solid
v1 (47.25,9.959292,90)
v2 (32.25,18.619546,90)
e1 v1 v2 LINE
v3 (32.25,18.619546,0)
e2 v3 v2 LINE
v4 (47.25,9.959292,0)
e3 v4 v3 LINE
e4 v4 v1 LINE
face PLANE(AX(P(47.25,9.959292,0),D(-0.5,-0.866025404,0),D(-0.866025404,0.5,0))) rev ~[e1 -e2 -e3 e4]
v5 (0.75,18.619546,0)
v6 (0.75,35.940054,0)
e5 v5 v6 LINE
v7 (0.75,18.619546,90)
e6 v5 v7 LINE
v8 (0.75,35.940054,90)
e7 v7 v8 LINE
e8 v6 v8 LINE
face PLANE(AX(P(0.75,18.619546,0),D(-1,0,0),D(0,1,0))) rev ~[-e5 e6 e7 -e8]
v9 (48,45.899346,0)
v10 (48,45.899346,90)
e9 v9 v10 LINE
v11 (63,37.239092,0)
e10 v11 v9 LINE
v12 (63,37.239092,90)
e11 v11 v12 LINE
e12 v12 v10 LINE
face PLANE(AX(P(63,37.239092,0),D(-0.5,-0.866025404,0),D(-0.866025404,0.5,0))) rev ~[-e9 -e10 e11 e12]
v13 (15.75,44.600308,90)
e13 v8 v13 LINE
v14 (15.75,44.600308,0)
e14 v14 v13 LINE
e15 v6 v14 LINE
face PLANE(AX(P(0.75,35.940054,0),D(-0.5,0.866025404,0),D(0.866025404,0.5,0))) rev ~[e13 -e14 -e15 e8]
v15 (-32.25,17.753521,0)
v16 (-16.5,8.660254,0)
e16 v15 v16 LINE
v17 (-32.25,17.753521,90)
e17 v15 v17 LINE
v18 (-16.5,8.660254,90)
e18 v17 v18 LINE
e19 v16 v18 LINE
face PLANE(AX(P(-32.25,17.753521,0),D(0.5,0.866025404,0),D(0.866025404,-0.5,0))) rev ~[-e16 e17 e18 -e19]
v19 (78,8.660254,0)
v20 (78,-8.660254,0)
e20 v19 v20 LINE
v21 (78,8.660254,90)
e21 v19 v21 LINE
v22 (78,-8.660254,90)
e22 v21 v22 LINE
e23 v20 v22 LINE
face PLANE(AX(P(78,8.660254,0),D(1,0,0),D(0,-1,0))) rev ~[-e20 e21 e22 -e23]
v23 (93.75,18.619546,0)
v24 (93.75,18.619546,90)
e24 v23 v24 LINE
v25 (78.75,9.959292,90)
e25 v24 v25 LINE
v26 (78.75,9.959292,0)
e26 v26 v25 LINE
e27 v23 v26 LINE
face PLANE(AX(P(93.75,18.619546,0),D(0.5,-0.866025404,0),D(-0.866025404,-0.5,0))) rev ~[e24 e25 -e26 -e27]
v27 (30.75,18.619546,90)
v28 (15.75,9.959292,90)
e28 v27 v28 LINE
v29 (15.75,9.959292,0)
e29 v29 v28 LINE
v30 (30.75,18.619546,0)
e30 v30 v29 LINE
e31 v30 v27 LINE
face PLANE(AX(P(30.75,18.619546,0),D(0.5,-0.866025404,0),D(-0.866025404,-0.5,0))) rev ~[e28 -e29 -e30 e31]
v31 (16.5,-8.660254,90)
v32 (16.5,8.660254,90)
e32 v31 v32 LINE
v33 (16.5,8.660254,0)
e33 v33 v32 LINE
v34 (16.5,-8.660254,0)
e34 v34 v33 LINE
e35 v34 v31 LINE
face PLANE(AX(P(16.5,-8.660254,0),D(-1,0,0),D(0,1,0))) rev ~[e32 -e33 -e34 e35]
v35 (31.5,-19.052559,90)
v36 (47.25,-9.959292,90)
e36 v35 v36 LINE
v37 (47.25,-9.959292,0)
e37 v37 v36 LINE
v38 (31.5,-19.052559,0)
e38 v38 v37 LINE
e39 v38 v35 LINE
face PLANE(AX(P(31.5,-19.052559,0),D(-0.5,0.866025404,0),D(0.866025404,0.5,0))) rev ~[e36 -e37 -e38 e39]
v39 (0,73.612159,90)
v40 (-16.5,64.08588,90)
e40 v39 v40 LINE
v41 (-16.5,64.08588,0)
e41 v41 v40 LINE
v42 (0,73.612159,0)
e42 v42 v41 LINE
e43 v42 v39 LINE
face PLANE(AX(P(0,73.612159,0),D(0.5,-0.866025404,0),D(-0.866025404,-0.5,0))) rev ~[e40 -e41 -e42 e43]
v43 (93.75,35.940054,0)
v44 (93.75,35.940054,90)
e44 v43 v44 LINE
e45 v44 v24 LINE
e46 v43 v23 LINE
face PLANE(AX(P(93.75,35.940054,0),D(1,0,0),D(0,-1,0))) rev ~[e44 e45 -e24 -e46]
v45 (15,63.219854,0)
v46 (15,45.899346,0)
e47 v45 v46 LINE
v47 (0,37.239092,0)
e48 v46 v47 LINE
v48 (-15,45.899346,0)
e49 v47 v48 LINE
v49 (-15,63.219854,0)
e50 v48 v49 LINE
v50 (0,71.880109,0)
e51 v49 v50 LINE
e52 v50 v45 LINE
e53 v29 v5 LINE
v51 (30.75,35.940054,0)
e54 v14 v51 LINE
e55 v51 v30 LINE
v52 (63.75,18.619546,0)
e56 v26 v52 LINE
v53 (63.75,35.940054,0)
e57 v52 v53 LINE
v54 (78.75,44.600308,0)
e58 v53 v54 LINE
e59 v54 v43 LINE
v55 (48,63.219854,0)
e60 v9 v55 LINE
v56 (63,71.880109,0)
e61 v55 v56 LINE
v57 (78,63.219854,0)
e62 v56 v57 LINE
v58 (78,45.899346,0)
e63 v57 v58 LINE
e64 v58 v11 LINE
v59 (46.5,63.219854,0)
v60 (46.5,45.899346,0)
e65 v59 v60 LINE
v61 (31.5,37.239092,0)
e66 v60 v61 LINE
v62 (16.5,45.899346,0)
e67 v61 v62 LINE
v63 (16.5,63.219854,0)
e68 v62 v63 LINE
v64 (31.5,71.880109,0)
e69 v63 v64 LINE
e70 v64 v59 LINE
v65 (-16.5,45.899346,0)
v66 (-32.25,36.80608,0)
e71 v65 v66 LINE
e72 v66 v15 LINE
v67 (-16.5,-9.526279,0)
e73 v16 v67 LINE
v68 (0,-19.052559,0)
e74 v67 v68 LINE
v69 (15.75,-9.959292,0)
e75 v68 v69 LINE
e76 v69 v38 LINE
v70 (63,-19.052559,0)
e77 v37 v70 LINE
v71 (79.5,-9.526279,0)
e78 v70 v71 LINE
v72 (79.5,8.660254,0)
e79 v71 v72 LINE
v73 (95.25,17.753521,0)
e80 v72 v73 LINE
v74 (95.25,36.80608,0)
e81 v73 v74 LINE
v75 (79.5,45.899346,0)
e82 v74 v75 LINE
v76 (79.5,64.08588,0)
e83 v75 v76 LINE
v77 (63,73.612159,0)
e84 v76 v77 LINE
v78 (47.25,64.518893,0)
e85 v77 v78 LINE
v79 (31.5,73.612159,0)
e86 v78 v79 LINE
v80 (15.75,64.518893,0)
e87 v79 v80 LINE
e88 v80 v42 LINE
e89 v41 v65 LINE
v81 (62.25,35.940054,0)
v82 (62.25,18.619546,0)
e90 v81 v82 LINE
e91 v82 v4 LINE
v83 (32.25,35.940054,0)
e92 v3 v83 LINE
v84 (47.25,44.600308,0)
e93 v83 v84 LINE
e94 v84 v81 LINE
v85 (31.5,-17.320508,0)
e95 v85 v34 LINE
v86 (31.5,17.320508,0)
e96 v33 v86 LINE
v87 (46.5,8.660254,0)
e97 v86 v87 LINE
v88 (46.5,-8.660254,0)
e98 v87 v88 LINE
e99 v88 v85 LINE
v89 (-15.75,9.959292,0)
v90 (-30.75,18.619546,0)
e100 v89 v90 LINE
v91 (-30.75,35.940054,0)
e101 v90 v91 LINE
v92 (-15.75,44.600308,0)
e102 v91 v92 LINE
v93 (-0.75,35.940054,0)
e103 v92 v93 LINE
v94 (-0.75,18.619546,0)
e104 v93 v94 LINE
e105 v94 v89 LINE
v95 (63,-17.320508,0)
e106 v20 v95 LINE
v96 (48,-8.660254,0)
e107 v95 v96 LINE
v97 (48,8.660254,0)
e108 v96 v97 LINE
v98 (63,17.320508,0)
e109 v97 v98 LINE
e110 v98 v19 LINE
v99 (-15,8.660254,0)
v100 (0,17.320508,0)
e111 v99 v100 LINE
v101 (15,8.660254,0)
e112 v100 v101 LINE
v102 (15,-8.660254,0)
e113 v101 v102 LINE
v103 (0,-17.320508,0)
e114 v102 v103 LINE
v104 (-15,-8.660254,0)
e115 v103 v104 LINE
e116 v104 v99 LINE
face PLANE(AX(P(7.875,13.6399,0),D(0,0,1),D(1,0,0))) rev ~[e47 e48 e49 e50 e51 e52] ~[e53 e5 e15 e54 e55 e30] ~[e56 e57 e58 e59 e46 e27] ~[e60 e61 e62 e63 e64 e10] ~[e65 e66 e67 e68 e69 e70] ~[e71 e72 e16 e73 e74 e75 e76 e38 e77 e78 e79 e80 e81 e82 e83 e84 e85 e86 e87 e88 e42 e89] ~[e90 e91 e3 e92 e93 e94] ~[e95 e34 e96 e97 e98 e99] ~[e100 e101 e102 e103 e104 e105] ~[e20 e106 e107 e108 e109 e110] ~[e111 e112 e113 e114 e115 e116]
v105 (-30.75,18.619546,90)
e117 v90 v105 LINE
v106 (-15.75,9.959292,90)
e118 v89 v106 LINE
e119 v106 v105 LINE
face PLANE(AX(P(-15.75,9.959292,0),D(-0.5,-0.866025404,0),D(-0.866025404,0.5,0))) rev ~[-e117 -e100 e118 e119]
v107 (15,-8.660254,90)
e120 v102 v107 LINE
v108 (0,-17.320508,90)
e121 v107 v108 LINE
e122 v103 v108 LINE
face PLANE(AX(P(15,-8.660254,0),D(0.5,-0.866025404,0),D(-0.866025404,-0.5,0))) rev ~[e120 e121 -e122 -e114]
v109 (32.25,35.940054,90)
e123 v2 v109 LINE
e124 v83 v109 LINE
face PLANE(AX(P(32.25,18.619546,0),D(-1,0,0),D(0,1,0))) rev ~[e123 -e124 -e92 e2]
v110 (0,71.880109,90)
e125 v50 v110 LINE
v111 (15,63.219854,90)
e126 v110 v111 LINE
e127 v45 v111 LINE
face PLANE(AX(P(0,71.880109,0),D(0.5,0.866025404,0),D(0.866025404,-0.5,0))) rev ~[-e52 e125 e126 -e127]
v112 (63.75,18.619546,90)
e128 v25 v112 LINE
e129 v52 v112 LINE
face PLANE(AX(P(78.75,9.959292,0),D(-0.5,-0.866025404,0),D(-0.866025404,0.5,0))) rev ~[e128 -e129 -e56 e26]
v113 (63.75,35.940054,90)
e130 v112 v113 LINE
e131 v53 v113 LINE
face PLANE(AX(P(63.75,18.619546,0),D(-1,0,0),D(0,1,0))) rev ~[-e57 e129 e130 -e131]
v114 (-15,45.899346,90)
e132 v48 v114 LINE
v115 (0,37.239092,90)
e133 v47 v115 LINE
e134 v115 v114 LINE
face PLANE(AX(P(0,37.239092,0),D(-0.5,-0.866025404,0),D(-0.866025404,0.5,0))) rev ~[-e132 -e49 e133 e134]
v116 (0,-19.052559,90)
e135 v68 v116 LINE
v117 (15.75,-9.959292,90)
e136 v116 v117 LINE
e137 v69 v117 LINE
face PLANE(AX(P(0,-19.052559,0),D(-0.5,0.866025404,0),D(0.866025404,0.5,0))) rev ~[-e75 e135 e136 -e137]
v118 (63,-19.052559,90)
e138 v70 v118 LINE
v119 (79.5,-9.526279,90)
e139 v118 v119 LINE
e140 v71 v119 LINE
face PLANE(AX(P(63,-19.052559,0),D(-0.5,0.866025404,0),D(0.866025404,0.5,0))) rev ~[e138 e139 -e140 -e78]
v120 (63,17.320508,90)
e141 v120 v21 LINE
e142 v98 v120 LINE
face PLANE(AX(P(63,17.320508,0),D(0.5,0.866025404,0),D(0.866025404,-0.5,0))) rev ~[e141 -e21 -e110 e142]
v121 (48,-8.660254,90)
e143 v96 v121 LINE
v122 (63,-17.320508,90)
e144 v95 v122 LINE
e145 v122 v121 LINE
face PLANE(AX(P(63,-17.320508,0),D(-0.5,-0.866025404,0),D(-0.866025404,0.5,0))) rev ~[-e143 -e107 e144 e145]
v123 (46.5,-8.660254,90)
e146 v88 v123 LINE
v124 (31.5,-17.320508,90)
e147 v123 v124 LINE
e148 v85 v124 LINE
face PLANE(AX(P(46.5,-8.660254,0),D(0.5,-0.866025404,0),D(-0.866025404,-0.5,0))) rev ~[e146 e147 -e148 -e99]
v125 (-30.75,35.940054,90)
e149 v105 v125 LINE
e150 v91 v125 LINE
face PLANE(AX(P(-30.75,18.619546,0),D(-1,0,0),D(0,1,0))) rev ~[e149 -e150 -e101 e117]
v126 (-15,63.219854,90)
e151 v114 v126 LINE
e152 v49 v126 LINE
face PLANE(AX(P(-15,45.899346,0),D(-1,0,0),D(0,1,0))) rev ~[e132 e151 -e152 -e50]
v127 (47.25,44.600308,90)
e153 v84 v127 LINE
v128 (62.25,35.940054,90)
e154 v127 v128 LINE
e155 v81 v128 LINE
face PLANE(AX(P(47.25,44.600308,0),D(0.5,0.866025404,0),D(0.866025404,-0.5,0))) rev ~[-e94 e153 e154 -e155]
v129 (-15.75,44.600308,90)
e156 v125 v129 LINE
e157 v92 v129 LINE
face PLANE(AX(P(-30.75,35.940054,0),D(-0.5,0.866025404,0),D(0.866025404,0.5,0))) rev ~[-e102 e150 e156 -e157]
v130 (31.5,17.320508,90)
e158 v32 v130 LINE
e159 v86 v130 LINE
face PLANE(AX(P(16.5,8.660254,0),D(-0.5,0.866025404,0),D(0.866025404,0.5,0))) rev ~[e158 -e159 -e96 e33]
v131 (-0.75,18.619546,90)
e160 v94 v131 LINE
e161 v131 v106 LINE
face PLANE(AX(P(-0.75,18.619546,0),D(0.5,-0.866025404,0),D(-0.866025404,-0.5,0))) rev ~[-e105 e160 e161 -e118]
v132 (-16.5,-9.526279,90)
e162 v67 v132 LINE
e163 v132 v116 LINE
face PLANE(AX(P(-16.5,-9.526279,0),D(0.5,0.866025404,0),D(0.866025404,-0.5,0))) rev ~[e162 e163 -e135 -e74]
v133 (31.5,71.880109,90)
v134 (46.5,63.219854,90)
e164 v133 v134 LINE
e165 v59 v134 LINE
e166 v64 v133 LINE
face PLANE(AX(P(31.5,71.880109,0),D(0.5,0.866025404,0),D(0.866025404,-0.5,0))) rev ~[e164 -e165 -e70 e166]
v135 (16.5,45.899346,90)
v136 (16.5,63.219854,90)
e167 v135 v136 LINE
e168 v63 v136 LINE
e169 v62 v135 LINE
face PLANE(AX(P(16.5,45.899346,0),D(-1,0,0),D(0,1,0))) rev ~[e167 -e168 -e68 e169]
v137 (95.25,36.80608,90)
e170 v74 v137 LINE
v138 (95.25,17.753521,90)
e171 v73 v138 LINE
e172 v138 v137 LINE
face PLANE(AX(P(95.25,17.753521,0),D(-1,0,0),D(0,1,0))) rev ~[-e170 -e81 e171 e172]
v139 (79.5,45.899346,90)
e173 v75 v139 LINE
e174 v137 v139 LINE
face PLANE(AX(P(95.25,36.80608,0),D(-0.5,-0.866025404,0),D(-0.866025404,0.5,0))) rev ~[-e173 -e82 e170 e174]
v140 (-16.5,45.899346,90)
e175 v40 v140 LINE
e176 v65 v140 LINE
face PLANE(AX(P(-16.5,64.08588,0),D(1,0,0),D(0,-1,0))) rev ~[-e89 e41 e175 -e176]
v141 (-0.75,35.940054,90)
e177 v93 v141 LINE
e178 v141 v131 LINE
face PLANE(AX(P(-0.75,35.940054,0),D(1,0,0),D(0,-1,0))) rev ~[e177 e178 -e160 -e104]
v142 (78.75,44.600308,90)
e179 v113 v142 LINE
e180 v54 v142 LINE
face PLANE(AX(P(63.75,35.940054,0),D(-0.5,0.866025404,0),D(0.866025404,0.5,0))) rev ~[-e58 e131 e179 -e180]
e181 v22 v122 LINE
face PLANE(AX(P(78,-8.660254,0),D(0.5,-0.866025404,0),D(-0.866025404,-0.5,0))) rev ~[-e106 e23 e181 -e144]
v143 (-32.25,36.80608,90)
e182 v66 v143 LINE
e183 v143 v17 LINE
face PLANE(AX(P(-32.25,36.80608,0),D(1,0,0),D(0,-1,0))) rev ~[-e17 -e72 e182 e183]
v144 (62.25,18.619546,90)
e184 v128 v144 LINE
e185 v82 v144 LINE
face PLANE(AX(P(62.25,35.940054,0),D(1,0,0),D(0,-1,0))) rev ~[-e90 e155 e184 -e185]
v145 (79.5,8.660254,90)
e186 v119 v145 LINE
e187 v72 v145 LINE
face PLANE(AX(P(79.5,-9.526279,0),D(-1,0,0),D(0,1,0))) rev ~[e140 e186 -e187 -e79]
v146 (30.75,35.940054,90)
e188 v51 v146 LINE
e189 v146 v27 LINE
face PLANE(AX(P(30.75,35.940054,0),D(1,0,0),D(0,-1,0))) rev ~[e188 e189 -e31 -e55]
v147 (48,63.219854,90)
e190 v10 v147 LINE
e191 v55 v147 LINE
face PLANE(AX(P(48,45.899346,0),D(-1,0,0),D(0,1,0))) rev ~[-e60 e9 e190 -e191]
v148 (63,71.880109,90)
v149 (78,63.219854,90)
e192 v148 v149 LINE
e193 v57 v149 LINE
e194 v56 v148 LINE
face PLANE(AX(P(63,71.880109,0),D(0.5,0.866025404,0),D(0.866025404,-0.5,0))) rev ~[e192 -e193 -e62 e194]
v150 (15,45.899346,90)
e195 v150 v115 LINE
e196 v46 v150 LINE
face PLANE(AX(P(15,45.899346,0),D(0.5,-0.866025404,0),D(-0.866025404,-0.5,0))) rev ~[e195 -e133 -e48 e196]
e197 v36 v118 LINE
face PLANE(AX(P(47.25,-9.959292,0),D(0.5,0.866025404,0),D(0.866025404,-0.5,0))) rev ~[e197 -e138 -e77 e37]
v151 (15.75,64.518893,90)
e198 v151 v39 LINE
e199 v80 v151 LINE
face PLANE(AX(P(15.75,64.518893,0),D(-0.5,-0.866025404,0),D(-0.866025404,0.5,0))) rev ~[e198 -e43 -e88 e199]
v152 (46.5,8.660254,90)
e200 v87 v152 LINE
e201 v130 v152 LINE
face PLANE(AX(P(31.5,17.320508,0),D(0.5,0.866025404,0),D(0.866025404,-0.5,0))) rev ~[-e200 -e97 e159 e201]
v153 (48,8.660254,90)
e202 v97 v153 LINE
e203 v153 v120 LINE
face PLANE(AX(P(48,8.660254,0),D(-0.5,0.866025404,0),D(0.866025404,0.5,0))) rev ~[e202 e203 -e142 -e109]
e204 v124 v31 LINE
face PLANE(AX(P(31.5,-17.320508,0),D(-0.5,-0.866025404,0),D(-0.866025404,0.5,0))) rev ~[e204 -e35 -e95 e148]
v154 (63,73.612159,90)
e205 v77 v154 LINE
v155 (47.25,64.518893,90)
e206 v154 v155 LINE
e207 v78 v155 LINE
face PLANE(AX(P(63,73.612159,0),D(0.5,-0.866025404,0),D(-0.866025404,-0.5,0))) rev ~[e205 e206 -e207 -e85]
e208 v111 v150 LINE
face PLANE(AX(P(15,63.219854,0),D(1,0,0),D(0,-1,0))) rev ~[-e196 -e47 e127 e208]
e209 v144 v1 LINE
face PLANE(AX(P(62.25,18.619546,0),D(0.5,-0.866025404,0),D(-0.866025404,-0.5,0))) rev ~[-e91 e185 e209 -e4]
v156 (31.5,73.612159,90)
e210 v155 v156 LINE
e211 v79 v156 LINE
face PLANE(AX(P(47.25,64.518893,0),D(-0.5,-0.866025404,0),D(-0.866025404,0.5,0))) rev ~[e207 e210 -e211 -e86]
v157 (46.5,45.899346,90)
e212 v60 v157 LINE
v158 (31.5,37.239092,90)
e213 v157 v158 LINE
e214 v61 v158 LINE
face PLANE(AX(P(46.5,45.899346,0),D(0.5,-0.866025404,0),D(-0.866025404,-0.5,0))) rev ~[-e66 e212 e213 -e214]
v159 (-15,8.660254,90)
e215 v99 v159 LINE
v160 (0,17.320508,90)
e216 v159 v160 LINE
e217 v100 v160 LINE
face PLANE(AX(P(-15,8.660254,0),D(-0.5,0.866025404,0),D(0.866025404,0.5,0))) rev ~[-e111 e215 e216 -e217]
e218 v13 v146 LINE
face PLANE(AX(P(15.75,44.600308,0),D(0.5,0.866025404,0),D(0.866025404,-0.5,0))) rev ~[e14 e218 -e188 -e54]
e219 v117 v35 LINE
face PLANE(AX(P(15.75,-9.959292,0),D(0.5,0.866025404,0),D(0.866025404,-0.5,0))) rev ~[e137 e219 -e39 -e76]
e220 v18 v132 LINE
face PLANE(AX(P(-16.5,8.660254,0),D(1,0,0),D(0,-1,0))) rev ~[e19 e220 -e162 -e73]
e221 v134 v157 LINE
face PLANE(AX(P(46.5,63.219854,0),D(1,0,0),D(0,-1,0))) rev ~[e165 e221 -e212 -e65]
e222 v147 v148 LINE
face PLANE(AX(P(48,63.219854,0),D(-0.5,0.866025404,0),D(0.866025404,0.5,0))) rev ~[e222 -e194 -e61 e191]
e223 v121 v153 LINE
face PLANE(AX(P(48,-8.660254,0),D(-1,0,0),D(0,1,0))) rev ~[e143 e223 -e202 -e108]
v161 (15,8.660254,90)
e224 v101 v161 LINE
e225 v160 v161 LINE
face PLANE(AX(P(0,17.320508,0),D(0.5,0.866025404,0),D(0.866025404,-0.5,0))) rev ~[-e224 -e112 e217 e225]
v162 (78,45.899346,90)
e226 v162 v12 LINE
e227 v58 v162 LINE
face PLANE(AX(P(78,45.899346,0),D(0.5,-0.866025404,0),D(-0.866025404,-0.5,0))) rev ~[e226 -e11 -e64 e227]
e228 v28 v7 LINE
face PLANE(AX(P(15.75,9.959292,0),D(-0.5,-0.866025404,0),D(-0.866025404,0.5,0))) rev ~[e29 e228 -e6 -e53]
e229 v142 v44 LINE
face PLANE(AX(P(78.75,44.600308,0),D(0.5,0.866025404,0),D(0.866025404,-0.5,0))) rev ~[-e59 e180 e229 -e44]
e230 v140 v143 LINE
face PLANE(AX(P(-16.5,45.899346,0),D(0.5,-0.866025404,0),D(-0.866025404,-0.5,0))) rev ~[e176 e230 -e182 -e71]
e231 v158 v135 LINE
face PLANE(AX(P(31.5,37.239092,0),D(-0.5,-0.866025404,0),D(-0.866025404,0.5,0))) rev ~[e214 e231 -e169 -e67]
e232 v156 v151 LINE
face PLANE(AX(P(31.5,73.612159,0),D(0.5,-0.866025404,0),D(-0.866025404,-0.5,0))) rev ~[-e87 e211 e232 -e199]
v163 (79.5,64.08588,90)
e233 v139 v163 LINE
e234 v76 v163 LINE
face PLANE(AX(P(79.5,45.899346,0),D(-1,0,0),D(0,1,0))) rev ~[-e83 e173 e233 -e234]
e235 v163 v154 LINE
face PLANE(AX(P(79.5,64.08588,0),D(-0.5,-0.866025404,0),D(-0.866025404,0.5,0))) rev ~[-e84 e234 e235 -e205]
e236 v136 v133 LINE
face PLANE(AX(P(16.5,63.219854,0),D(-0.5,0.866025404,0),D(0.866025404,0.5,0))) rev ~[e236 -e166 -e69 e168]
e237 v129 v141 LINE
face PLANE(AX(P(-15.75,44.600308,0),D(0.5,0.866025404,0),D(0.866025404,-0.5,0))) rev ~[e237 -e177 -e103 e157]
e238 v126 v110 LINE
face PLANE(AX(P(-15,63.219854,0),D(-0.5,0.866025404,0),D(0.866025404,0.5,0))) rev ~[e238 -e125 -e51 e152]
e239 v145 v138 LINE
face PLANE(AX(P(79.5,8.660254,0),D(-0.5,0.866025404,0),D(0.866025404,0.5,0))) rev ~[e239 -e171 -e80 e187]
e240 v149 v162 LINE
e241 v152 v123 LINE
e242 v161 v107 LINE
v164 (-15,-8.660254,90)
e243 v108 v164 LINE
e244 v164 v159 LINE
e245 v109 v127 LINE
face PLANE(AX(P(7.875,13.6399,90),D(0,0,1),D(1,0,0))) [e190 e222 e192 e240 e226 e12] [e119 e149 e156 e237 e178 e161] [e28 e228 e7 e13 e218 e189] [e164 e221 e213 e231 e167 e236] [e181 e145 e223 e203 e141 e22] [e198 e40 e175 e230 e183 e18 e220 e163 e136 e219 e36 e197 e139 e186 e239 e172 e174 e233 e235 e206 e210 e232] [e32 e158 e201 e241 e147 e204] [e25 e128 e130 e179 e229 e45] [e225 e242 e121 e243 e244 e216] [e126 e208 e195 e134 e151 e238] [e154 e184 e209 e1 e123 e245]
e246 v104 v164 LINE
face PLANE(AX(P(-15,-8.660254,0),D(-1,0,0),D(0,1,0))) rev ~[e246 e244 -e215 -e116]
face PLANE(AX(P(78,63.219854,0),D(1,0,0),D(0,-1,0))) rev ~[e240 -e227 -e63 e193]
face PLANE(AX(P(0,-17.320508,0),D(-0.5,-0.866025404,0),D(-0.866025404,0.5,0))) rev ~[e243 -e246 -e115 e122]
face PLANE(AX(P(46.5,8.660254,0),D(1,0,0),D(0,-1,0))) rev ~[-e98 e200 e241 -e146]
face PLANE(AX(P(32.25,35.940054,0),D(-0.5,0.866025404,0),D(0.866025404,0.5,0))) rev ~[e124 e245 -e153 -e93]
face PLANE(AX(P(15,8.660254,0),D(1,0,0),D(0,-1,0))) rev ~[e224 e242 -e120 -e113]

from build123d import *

# Parameters (mm, degrees)
F2_DEPTH = 90


with BuildPart() as f2:
    # F0 (on Top) → F2 (new body)
    with BuildSketch(Plane.XY):
        Polygon((0.75, 17.7535207776), (0, 17.3205080757), (15, 8.6602540378), (15, 9.5262794416), (15.75, 9.9592921435), (0.75, 18.6195461814), align=None)
        Polygon((-0.75, 17.7535207776), (0, 17.3205080757), (0.75, 17.7535207776), (0.75, 18.6195461814), (0, 19.0525588833), (-0.75, 18.6195461814), align=None)
        Polygon((-15, 8.6602540378), (0, 17.3205080757), (-0.75, 17.7535207776), (-0.75, 18.6195461814), (-15.75, 9.9592921435), (-16.5, 9.5262794416), (-16.5, 8.6602540378), (-15.75, 8.227241336), align=None)
        Polygon((15.75, 8.227241336), (15, 8.6602540378), (15, -8.6602540378), (15, -9.5262794416), (15.75, -9.9592921435), (16.5, -9.5262794416), (16.5, -8.6602540378), (16.5, 8.6602540378), align=None)
        Polygon((15, 9.5262794416), (15, 8.6602540378), (15.75, 8.227241336), (16.5, 8.6602540378), (16.5, 9.5262794416), (15.75, 9.9592921435), align=None)
        Polygon((-15, -8.6602540378), (-15, 8.6602540378), (-15.75, 8.227241336), (-16.5, 8.6602540378), (-16.5, -9.5262794416), (0, -19.0525588833), (15.75, -9.9592921435), (15, -9.5262794416), (15, -8.6602540378), (0, -17.3205080757), align=None)
        Polygon((0, 19.0525588833), (0.75, 18.6195461814), (0.75, 35.9400542571), (0, 35.5070415552), (-0.75, 35.9400542571), (-0.75, 18.6195461814), align=None)
        Polygon((30.75, 18.6195461814), (15.75, 9.9592921435), (16.5, 9.5262794416), (16.5, 8.6602540378), (31.5, 17.3205080757), (30.75, 17.7535207776), align=None)
        Polygon((-32.25, 17.7535207776), (-16.5, 8.6602540378), (-16.5, 9.5262794416), (-15.75, 9.9592921435), (-30.75, 18.6195461814), (-30.75, 35.9400542571), (-15.75, 44.6003082949), (-16.5, 45.0333209968), (-16.5, 45.8993464006), (-32.25, 36.8060796608), align=None)
        Polygon((0, 35.5070415552), (0.75, 35.9400542571), (0.75, 36.8060796608), (0, 37.2390923627), (-0.75, 36.8060796608), (-0.75, 35.9400542571), align=None)
        Polygon((0.75, 36.8060796608), (0.75, 35.9400542571), (15.75, 44.6003082949), (15, 45.0333209968), (15, 45.8993464006), (0, 37.2390923627), align=None)
        Polygon((-15.75, 44.6003082949), (-0.75, 35.9400542571), (-0.75, 36.8060796608), (0, 37.2390923627), (-15, 45.8993464006), (-15.75, 46.3323591025), (-16.5, 45.8993464006), (-16.5, 45.0333209968), align=None)
        Polygon((16.5, -9.5262794416), (15.75, -9.9592921435), (31.5, -19.0525588833), (47.25, -9.9592921435), (46.5, -9.5262794416), (46.5, -8.6602540378), (31.5, -17.3205080757), (16.5, -8.6602540378), align=None)
        Polygon((30.75, 35.9400542571), (30.75, 18.6195461814), (31.5, 19.0525588833), (32.25, 18.6195461814), (32.25, 35.9400542571), (31.5, 35.5070415552), align=None)
        Polygon((31.5, 19.0525588833), (30.75, 18.6195461814), (30.75, 17.7535207776), (31.5, 17.3205080757), (32.25, 17.7535207776), (32.25, 18.6195461814), align=None)
        Polygon((32.25, 17.7535207776), (31.5, 17.3205080757), (46.5, 8.6602540378), (46.5, 9.5262794416), (47.25, 9.9592921435), (32.25, 18.6195461814), align=None)
        Polygon((16.5, 45.0333209968), (15.75, 44.6003082949), (30.75, 35.9400542571), (30.75, 36.8060796608), (31.5, 37.2390923627), (16.5, 45.8993464006), align=None)
        Polygon((15, 45.0333209968), (15.75, 44.6003082949), (16.5, 45.0333209968), (16.5, 45.8993464006), (15.75, 46.3323591025), (15, 45.8993464006), align=None)
        Polygon((30.75, 36.8060796608), (30.75, 35.9400542571), (31.5, 35.5070415552), (32.25, 35.9400542571), (32.25, 36.8060796608), (31.5, 37.2390923627), align=None)
        Polygon((47.25, 8.227241336), (46.5, 8.6602540378), (46.5, -8.6602540378), (46.5, -9.5262794416), (47.25, -9.9592921435), (48, -9.5262794416), (48, -8.6602540378), (48, 8.6602540378), align=None)
        Polygon((46.5, 9.5262794416), (46.5, 8.6602540378), (47.25, 8.227241336), (48, 8.6602540378), (48, 9.5262794416), (47.25, 9.9592921435), align=None)
        Polygon((48, -9.5262794416), (47.25, -9.9592921435), (63, -19.0525588833), (79.5, -9.5262794416), (79.5, 8.6602540378), (78.75, 8.227241336), (78, 8.6602540378), (78, -8.6602540378), (63, -17.3205080757), (48, -8.6602540378), align=None)
        Polygon((-16.5, 64.08587988), (-16.5, 45.8993464006), (-15.75, 46.3323591025), (-15, 45.8993464006), (-15, 63.2198544763), (0, 71.8801085141), (15, 63.2198544763), (15, 64.08587988), (15.75, 64.5188925819), (0, 73.6121593217), align=None)
        Polygon((15, 63.2198544763), (15, 45.8993464006), (15.75, 46.3323591025), (16.5, 45.8993464006), (16.5, 63.2198544763), (16.5, 64.08587988), (15.75, 64.5188925819), (15, 64.08587988), align=None)
        Polygon((62.25, 18.6195461814), (47.25, 9.9592921435), (48, 9.5262794416), (48, 8.6602540378), (63, 17.3205080757), (62.25, 17.7535207776), align=None)
        Polygon((32.25, 36.8060796608), (32.25, 35.9400542571), (47.25, 44.6003082949), (46.5, 45.0333209968), (46.5, 45.8993464006), (31.5, 37.2390923627), align=None)
        Polygon((16.5, 64.08587988), (16.5, 63.2198544763), (31.5, 71.8801085141), (46.5, 63.2198544763), (46.5, 64.08587988), (47.25, 64.5188925819), (31.5, 73.6121593217), (15.75, 64.5188925819), align=None)
        Polygon((62.25, 35.9400542571), (62.25, 18.6195461814), (63, 19.0525588833), (63.75, 18.6195461814), (63.75, 35.9400542571), (63, 35.5070415552), align=None)
        Polygon((63, 19.0525588833), (62.25, 18.6195461814), (62.25, 17.7535207776), (63, 17.3205080757), (63.75, 17.7535207776), (63.75, 18.6195461814), align=None)
        Polygon((48, 45.0333209968), (47.25, 44.6003082949), (62.25, 35.9400542571), (62.25, 36.8060796608), (63, 37.2390923627), (48, 45.8993464006), align=None)
        Polygon((46.5, 45.0333209968), (47.25, 44.6003082949), (48, 45.0333209968), (48, 45.8993464006), (47.25, 46.3323591025), (46.5, 45.8993464006), align=None)
        Polygon((46.5, 63.2198544763), (46.5, 45.8993464006), (47.25, 46.3323591025), (48, 45.8993464006), (48, 63.2198544763), (48, 64.08587988), (47.25, 64.5188925819), (46.5, 64.08587988), align=None)
        Polygon((63.75, 17.7535207776), (63, 17.3205080757), (78, 8.6602540378), (78.75, 8.227241336), (79.5, 8.6602540378), (79.5, 9.5262794416), (78.75, 9.9592921435), (63.75, 18.6195461814), align=None)
        Polygon((79.5, 9.5262794416), (79.5, 8.6602540378), (95.25, 17.7535207776), (95.25, 36.8060796608), (79.5, 45.8993464006), (79.5, 45.0333209968), (78.75, 44.6003082949), (93.75, 35.9400542571), (93.75, 18.6195461814), (78.75, 9.9592921435), align=None)
        Polygon((62.25, 36.8060796608), (62.25, 35.9400542571), (63, 35.5070415552), (63.75, 35.9400542571), (63.75, 36.8060796608), (63, 37.2390923627), align=None)
        Polygon((63.75, 36.8060796608), (63.75, 35.9400542571), (78.75, 44.6003082949), (79.5, 45.0333209968), (79.5, 45.8993464006), (78.75, 46.3323591025), (78, 45.8993464006), (63, 37.2390923627), align=None)
        Polygon((48, 64.08587988), (48, 63.2198544763), (63, 71.8801085141), (78, 63.2198544763), (78, 45.8993464006), (78.75, 46.3323591025), (79.5, 45.8993464006), (79.5, 64.08587988), (63, 73.6121593217), (47.25, 64.5188925819), align=None)
    extrude(amount=F2_DEPTH)


solid = f2.part
